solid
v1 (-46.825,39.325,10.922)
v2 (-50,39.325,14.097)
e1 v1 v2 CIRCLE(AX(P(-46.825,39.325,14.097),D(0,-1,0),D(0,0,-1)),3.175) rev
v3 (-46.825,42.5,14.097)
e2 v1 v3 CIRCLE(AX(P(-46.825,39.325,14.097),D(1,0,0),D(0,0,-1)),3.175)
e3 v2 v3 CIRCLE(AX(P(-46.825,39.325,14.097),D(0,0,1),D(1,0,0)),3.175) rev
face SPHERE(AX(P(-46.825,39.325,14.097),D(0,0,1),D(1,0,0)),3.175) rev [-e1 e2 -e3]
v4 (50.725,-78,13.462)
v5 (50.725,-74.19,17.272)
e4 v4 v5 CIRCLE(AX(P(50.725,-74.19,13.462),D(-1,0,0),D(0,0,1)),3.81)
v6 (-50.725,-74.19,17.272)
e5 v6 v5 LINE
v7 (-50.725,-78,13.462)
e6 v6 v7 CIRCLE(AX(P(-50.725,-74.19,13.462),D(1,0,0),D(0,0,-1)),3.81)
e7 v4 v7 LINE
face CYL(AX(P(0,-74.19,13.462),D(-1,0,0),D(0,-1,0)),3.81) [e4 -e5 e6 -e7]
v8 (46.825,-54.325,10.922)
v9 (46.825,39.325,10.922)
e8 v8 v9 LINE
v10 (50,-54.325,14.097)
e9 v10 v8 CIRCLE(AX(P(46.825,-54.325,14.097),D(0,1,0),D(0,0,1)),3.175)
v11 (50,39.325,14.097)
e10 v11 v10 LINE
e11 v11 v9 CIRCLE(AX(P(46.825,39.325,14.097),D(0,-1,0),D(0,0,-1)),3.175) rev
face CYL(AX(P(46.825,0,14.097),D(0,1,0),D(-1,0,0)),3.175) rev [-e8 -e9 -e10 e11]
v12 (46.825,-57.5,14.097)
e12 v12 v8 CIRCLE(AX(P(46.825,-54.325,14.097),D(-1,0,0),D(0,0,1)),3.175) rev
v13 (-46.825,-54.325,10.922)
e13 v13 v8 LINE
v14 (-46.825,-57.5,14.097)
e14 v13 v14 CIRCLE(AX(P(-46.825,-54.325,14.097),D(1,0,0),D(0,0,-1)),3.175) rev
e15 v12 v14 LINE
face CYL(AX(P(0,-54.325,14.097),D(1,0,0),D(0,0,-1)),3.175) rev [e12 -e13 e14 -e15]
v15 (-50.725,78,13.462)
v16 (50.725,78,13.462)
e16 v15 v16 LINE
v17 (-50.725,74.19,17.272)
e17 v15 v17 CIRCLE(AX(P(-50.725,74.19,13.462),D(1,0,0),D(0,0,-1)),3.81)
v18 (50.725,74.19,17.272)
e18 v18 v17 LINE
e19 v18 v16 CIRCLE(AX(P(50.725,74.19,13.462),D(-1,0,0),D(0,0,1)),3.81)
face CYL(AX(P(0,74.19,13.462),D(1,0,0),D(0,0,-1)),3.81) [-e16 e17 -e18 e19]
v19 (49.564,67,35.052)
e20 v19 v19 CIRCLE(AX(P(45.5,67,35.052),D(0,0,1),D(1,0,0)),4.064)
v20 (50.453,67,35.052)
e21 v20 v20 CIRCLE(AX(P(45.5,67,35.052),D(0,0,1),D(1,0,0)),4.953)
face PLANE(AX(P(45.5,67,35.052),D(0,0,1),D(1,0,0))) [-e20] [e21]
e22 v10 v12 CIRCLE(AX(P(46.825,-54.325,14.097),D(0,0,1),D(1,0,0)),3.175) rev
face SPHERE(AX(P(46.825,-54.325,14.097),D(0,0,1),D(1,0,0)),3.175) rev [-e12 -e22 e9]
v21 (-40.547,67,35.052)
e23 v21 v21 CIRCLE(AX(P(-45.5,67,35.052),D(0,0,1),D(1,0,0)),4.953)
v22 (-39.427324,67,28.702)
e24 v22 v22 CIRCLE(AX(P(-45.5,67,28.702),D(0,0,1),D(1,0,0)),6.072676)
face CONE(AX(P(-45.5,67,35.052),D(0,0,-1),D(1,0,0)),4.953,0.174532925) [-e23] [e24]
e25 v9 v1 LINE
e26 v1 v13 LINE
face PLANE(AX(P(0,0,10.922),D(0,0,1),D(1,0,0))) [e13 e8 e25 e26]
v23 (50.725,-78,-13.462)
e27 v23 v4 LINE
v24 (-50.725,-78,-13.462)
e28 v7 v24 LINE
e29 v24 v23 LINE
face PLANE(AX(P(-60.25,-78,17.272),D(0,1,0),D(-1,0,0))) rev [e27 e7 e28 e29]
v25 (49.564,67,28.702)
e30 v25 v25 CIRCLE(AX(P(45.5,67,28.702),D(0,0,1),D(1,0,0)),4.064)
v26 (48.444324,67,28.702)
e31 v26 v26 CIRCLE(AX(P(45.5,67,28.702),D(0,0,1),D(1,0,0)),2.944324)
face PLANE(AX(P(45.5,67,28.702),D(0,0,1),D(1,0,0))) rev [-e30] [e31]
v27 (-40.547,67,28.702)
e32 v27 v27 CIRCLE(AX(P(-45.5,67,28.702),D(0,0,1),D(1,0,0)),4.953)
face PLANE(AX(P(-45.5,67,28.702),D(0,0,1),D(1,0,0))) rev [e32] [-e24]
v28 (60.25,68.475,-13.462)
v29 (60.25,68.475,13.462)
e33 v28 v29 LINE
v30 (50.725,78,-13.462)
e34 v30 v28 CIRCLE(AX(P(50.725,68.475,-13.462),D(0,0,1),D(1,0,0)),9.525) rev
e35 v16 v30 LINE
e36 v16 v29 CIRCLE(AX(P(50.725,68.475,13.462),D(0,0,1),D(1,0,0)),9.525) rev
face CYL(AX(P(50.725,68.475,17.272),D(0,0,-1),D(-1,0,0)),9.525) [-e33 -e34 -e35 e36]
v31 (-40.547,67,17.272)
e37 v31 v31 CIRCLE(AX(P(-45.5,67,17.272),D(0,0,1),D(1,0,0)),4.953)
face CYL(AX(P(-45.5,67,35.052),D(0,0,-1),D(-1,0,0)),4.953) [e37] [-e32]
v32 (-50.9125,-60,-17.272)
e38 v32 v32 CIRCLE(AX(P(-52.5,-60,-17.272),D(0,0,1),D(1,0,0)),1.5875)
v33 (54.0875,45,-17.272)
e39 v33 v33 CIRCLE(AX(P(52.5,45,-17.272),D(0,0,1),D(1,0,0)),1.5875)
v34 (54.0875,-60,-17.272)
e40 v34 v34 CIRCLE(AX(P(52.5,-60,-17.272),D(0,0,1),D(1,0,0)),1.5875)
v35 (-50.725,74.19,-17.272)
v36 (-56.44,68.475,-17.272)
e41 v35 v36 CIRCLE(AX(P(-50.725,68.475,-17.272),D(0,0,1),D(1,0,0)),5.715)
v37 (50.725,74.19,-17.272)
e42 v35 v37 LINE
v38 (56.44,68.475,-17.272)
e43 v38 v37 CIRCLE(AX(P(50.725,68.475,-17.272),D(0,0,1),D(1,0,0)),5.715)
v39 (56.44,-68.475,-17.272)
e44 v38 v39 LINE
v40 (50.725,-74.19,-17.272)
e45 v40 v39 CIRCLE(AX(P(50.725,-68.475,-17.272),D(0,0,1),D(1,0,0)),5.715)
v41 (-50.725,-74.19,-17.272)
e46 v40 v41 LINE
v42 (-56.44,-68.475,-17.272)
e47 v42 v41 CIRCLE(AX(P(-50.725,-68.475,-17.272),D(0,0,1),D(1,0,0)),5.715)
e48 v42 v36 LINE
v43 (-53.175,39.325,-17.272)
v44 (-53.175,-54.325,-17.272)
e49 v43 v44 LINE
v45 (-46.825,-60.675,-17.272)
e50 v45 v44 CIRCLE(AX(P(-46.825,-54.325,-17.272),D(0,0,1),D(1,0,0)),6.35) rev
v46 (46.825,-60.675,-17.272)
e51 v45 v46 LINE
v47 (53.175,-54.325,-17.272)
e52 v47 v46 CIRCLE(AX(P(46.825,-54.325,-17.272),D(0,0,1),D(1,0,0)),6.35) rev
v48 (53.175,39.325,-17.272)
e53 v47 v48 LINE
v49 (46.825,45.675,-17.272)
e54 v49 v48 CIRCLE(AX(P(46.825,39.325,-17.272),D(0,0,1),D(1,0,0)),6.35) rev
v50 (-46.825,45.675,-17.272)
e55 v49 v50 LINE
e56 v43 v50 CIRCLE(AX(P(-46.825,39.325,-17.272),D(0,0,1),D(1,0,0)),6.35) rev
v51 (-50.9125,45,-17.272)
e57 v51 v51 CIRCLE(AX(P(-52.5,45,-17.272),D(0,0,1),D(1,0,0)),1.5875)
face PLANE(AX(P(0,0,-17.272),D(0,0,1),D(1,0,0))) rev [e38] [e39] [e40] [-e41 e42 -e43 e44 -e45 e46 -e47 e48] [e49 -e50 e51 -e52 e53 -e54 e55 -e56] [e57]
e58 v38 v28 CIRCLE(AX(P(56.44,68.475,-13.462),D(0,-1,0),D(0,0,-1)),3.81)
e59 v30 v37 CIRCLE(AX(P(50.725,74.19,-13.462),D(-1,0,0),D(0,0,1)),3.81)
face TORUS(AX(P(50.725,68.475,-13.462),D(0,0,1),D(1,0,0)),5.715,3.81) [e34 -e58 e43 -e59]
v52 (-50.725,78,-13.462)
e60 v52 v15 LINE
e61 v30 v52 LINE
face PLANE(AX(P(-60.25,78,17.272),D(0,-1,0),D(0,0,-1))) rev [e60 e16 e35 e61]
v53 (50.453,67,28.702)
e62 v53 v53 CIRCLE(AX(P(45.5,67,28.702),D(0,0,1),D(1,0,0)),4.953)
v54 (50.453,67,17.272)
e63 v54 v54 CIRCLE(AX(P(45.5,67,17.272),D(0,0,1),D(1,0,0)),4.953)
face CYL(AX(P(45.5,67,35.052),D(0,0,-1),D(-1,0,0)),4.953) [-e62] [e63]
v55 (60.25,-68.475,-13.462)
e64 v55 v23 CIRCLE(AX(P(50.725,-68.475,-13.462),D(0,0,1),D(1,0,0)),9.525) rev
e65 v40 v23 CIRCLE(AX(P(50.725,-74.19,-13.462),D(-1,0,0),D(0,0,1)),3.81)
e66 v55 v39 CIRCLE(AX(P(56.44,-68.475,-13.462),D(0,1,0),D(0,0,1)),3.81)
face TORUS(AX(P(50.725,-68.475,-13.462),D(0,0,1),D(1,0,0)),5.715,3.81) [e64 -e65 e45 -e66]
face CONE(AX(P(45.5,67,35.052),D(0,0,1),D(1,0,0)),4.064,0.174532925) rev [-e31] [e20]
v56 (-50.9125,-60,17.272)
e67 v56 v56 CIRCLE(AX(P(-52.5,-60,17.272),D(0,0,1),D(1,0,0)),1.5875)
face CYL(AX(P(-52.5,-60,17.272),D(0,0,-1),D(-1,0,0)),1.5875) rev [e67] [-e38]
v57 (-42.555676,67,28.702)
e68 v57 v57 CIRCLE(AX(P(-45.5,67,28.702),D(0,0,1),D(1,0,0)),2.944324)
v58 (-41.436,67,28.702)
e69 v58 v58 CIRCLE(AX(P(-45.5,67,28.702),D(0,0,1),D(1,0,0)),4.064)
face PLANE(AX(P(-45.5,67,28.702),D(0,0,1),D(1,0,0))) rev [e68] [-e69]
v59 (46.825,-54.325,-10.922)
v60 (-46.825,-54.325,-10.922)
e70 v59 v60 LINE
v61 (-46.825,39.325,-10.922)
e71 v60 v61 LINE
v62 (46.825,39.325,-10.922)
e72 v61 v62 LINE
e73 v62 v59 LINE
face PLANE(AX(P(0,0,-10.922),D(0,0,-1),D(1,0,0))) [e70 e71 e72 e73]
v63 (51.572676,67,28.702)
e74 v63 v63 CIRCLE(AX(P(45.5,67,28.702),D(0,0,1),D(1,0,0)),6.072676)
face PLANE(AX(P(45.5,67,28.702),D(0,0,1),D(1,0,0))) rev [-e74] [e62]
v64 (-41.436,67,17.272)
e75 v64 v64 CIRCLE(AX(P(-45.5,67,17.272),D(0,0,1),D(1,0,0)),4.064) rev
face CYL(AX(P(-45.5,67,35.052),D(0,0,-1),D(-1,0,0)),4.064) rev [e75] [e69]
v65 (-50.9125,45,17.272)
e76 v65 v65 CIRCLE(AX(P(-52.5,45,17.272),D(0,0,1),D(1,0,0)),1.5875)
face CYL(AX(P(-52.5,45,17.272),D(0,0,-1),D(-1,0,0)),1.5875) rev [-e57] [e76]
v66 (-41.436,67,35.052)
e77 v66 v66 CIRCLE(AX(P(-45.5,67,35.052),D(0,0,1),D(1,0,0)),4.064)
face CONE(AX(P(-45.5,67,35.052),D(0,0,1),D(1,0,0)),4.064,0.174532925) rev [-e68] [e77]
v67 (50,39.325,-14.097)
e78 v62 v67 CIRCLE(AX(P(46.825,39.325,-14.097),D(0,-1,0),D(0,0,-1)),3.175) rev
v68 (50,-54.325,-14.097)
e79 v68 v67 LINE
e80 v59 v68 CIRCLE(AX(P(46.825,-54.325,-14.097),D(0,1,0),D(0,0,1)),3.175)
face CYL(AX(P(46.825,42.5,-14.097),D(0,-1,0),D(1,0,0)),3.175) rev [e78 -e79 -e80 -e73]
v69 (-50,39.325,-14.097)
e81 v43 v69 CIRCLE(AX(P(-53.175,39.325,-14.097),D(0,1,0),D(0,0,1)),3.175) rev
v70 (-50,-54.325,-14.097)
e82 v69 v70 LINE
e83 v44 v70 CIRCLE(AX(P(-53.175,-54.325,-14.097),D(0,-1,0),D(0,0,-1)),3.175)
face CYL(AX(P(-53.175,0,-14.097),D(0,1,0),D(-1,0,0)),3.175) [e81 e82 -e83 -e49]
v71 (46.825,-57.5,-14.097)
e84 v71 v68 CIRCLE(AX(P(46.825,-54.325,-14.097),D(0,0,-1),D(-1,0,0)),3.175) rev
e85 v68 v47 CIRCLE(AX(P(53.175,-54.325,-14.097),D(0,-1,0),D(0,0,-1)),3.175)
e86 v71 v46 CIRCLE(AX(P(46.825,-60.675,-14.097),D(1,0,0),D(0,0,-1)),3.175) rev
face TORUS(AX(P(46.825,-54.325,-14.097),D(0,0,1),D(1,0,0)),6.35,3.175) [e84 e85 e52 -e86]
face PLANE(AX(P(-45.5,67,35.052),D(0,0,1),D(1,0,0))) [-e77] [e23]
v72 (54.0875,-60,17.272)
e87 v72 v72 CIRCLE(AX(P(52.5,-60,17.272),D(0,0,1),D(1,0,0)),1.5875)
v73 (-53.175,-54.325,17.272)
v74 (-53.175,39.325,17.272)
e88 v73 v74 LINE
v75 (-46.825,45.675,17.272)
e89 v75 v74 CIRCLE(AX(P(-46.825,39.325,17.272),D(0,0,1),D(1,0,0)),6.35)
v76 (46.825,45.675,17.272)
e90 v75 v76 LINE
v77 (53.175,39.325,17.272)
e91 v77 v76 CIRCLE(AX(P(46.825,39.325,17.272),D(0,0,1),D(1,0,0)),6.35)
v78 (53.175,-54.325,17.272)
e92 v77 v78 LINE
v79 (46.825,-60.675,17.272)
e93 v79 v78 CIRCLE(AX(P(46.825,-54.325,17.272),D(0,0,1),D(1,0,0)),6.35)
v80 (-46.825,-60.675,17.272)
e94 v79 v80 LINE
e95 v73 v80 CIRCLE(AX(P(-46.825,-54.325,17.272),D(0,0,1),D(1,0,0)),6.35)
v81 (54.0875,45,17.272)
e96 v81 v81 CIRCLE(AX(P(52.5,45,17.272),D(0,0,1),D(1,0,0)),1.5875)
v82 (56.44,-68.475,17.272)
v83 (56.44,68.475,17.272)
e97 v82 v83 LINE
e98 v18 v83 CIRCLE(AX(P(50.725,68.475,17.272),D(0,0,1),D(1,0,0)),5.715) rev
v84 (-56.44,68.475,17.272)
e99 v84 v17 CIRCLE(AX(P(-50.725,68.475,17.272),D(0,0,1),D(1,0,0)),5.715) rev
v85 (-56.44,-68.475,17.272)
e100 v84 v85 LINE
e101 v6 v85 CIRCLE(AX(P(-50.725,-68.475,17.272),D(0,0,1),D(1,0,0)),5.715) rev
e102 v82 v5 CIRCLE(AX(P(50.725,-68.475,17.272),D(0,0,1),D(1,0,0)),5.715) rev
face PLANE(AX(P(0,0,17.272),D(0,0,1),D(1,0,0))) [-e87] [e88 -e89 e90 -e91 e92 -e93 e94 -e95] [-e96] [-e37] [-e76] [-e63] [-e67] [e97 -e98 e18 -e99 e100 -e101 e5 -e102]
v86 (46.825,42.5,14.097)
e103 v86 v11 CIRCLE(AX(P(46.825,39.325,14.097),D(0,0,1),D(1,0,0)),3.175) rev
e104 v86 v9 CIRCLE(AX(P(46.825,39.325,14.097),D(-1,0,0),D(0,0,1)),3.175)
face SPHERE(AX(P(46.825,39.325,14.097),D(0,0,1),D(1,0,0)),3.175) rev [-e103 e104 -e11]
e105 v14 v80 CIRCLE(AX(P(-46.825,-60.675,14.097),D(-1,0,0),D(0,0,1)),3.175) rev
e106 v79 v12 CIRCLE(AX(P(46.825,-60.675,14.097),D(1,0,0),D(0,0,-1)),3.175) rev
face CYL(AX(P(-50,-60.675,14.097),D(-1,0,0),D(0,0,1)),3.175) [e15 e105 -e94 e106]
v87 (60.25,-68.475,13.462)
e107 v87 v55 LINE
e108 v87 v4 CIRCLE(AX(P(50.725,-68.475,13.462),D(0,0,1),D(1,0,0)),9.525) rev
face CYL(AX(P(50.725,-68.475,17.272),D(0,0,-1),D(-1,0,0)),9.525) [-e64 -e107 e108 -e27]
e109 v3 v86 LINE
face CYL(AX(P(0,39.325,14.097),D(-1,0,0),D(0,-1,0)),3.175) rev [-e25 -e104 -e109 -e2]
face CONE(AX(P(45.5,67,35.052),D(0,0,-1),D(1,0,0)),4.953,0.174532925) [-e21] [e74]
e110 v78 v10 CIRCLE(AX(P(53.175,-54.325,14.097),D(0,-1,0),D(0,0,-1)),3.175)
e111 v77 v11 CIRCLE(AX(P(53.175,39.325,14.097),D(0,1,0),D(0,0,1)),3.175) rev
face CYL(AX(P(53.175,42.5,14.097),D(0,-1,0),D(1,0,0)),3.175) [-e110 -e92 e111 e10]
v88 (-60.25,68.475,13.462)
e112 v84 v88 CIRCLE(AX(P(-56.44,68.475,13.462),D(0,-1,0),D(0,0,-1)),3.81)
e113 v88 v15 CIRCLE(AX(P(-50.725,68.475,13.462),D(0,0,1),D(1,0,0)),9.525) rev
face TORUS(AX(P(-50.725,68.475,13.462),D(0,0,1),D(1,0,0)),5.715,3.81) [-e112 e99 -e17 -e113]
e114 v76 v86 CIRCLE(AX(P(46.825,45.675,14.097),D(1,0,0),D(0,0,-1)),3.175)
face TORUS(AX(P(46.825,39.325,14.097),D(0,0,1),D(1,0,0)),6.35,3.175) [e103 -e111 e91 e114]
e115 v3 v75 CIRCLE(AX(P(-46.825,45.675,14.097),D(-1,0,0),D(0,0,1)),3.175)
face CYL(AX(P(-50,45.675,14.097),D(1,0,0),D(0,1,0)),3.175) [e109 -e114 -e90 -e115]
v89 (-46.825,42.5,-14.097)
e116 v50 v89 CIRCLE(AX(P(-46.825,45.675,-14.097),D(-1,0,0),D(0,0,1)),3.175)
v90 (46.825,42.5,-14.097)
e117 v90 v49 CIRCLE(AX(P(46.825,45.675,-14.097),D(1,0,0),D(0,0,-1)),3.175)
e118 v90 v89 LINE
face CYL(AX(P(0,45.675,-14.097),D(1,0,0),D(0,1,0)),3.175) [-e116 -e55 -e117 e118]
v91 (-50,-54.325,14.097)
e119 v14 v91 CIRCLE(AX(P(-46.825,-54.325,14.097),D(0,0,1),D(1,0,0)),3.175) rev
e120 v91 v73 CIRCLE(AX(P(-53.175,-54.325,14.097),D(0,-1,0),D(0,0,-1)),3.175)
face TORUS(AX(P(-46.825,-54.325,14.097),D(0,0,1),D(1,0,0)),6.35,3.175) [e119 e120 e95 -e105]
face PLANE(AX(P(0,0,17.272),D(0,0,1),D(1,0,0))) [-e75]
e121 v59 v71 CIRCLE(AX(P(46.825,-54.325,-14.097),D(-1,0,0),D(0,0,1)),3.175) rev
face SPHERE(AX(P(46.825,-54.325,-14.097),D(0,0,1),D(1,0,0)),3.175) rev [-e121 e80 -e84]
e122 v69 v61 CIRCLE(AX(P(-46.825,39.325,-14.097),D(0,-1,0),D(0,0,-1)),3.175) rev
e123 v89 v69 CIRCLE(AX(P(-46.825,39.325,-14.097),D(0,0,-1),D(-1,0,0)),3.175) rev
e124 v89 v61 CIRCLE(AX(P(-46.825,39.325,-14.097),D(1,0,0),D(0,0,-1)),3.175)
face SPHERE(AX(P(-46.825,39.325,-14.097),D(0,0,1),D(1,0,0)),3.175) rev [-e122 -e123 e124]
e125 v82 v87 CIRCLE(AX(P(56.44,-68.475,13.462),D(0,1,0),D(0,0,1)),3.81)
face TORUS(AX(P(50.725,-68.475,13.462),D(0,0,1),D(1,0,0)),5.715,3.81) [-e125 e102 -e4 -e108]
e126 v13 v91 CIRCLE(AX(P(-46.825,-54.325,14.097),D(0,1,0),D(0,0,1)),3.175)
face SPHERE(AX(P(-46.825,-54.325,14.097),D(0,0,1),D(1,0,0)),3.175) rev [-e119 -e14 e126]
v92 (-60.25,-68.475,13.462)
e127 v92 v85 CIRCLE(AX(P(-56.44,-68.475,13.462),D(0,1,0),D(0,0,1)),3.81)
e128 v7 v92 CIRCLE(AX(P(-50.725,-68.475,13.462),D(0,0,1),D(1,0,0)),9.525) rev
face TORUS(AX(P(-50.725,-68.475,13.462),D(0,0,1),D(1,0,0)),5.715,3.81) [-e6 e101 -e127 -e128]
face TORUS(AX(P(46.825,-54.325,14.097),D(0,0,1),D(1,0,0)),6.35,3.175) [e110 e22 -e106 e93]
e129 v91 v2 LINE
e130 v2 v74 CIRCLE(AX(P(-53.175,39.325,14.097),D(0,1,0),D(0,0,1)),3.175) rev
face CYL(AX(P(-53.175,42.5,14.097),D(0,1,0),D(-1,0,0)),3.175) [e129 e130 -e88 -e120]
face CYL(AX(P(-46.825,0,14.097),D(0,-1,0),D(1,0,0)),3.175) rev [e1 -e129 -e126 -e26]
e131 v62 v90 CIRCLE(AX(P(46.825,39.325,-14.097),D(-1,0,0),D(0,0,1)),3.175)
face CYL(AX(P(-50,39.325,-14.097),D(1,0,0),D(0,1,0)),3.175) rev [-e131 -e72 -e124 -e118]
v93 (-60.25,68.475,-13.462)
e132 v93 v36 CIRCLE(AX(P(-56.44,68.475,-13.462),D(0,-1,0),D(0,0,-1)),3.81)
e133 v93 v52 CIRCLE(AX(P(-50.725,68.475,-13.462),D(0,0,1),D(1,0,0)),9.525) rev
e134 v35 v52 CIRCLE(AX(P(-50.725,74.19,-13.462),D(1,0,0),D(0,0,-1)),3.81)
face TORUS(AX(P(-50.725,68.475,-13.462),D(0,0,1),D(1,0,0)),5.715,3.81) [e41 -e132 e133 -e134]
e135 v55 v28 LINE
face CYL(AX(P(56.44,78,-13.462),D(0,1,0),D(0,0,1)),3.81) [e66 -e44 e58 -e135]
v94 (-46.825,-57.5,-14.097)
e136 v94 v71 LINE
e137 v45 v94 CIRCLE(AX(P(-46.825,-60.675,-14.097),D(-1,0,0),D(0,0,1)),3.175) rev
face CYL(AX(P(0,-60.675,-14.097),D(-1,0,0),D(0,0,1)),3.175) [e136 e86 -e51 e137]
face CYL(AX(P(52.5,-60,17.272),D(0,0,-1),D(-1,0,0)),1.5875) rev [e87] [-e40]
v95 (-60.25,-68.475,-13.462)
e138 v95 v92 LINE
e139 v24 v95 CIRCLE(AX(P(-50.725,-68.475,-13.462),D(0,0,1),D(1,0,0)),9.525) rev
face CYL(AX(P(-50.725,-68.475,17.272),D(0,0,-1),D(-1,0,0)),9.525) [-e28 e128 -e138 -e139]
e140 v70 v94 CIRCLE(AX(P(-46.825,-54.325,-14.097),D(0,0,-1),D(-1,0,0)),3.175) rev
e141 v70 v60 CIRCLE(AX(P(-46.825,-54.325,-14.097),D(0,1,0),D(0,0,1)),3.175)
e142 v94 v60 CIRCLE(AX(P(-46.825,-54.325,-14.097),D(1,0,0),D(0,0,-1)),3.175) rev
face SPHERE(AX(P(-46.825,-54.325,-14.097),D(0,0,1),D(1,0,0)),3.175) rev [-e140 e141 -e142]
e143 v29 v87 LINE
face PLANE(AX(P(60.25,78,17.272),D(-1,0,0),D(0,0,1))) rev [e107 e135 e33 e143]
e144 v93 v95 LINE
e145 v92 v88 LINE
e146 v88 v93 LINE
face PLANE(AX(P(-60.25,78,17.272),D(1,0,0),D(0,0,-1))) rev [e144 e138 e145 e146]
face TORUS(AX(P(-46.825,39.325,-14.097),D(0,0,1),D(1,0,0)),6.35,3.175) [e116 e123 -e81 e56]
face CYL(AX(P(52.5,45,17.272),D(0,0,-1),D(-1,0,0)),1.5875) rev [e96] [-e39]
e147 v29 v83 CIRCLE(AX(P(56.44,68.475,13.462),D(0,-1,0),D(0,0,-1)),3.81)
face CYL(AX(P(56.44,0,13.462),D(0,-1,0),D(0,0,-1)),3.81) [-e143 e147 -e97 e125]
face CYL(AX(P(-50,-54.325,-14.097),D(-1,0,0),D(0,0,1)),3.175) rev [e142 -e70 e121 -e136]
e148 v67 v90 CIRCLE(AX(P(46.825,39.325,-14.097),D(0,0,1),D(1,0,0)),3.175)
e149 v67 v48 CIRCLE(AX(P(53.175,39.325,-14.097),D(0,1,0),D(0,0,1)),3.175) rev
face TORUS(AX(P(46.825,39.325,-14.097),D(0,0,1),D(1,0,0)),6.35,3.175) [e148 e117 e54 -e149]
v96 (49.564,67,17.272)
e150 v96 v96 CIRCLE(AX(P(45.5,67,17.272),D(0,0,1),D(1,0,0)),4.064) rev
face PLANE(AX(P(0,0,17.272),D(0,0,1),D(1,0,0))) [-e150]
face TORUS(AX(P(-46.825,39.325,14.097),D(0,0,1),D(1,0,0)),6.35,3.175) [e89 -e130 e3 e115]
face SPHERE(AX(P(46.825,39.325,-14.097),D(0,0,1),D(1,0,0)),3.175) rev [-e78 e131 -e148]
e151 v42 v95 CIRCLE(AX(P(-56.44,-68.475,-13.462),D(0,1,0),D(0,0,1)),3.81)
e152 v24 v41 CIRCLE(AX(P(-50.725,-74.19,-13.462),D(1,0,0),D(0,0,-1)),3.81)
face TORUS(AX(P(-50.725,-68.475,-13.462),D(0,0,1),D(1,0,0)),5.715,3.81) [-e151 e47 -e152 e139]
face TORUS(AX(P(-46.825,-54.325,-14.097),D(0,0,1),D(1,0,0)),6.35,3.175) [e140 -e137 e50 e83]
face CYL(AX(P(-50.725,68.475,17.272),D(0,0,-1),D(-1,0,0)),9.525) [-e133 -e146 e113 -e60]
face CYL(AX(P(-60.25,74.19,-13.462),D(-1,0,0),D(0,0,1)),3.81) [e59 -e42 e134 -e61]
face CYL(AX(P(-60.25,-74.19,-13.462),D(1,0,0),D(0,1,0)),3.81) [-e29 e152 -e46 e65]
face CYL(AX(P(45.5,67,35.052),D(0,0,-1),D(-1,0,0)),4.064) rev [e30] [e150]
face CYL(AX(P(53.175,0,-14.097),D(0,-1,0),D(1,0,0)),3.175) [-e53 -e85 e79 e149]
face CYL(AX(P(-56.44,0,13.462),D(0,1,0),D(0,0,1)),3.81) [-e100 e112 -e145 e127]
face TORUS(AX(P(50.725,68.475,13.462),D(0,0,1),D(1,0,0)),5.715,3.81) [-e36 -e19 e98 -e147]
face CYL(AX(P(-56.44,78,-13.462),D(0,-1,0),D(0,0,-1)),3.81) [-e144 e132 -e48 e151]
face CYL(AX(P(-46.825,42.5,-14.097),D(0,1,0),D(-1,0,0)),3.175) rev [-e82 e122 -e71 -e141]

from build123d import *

# Parameters (mm, degrees)
SKETCH1_W                     = 120.5
SKETCH1_H                     = 156
SKETCH1_R                     = 1.5875
BOSS_EXTRUDE1_DEPTH           = 17.272
SKETCH2_R                     = 4.953
SKETCH2_R_2                   = 4.064
BOSS_EXTRUDE2_DEPTH           = 17.78
SKETCH3_R                     = 4.953
SKETCH3_R_2                   = 4.064
BOSS_EXTRUDE3_DEPTH           = 6.35
BOSS_EXTRUDE3_DRAFT           = 10
BOSS_EXTRUDE3_PROFILE_2_DEPTH = 6.35
BOSS_EXTRUDE3_PROFILE_2_DRAFT = 10
FILLET1_R                     = 3.81
FILLET2_R                     = 9.525
SKETCH4_W                     = 100
SKETCH4_H                     = 100
CUT_EXTRUDE1_DEPTH            = 6.35
FILLET3_R                     = 3.175
FILLET3_OF_MIRROR1_R          = 3.175


# Some blends are built 0.0001 mm under size
with BuildPart() as part:
    # Sketch1 → Boss-Extrude1 (new, symmetric)
    with BuildSketch(Plane.XY):
        Rectangle(SKETCH1_W, SKETCH1_H)
        with Locations((-52.5, 45)):
            Circle(SKETCH1_R, mode=Mode.SUBTRACT)
        with Locations((52.5, 45)):
            Circle(SKETCH1_R, mode=Mode.SUBTRACT)
        with Locations((52.5, -60)):
            Circle(SKETCH1_R, mode=Mode.SUBTRACT)
        with Locations((-52.5, -60)):
            Circle(SKETCH1_R, mode=Mode.SUBTRACT)
    extrude(amount=BOSS_EXTRUDE1_DEPTH, both=True)

    # Sketch2 → Boss-Extrude2 (add)
    # profile 1 of 2: a face of its own
    with BuildSketch(Plane.XY.offset(17.272)):
        with Locations((-45.5, 67)):
            Circle(SKETCH2_R)
        with Locations((-45.5, 67)):
            Circle(SKETCH2_R_2, mode=Mode.SUBTRACT)
    # profile 2 of 2: a face of its own
    with BuildSketch(Plane.XY.offset(17.272)):
        with Locations((45.5, 67)):
            Circle(SKETCH2_R)
        with Locations((45.5, 67)):
            Circle(SKETCH2_R_2, mode=Mode.SUBTRACT)
    extrude(amount=BOSS_EXTRUDE2_DEPTH)


with BuildPart() as boss_extrude3_tool:
    # Sketch3 → Boss-Extrude3 (with draft: the straight prism first)
    with BuildSketch(Plane.XY.offset(35.052)):
        with Locations((-45.5, 67)):
            Circle(SKETCH3_R)
        with Locations((-45.5, 67)):
            Circle(SKETCH3_R_2, mode=Mode.SUBTRACT)
    extrude(amount=-BOSS_EXTRUDE3_DEPTH)
    # Boss-Extrude3: the draft: its side faces are tilted about the plane it starts from
    boss_extrude3_sides = [boss_extrude3_tool.faces().sort_by_distance(p)[0] for p in [
        (-50.453, 67, 31.877),
        (-49.564, 67, 31.877),
    ]]
    draft(boss_extrude3_sides, Plane.XY.offset(35.052), BOSS_EXTRUDE3_DRAFT)


with BuildPart() as part_1:
    add(part.part)

    # Boss-Extrude3: add boss_extrude3_tool
    add(boss_extrude3_tool.part)


with BuildPart() as boss_extrude3_profile_2_tool:
    # Sketch3 → Boss-Extrude3 profile 2 (with draft: the straight prism first)
    with BuildSketch(Plane.XY.offset(35.052)):
        with Locations((45.5, 67)):
            Circle(SKETCH3_R)
        with Locations((45.5, 67)):
            Circle(SKETCH3_R_2, mode=Mode.SUBTRACT)
    extrude(amount=-BOSS_EXTRUDE3_PROFILE_2_DEPTH)
    # Boss-Extrude3 profile 2: the draft: its side faces are tilted about the plane it starts from
    boss_extrude3_profile_2_sides = [boss_extrude3_profile_2_tool.faces().sort_by_distance(p)[0] for p in [
        (40.547, 67, 31.877),
        (41.436, 67, 31.877),
    ]]
    draft(boss_extrude3_profile_2_sides, Plane.XY.offset(35.052), BOSS_EXTRUDE3_PROFILE_2_DRAFT)


with BuildPart() as part_2:
    add(part_1.part)

    # Boss-Extrude3 profile 2: add boss_extrude3_profile_2_tool
    add(boss_extrude3_profile_2_tool.part)

    # Fillet1
    fillet1_edges = [part_2.edges().sort_by_distance(p)[0] for p in [
        (-60.25, 0, 17.272),
        (0, -78, 17.272),
        (60.25, 0, 17.272),
        (0, -78, -17.272),
        (-60.25, 0, -17.272),
        (0, 78, -17.272),
        (60.25, 0, -17.272),
        (0, 78, 17.272),
    ]]
    fillet(fillet1_edges, radius=FILLET1_R)

    # Fillet2
    # the kernel refuses this fillet: 9.525 mm, written as the material it takes off along each edge
    with BuildSketch(Plane(origin=(-50.725, 68.475, 17.272), x_dir=(0, 1, 0), z_dir=(1, 0, 0))) as fillet2_piece_1:
        with BuildLine():
            CenterArc((5.715, -3.81), 3.81, 0, 90)
            Line((9.525, -3.81), (9.525, 0))
            Line((9.525, 0), (5.715, 0))
        make_face()
    revolve(axis=Axis((-50.725, 68.475, 17.272), (0, 0, 1)), revolution_arc=90, mode=Mode.SUBTRACT)
    with BuildSketch(Plane(origin=(50.725, 68.475, 17.272), x_dir=(1, 0, 0), z_dir=(0, -1, 0))) as fillet2_piece_2:
        with BuildLine():
            CenterArc((5.715, -3.81), 3.81, 0, 90)
            Line((9.525, -3.81), (9.525, 0))
            Line((9.525, 0), (5.715, 0))
        make_face()
    revolve(axis=Axis((50.725, 68.475, 17.272), (0, 0, 1)), revolution_arc=90, mode=Mode.SUBTRACT)
    with BuildSketch(Plane(origin=(-50.725, -68.475, 17.272), x_dir=(-1, 0, 0), z_dir=(0, 1, 0))) as fillet2_piece_3:
        with BuildLine():
            CenterArc((5.715, -3.81), 3.81, 0, 90)
            Line((9.525, -3.81), (9.525, 0))
            Line((9.525, 0), (5.715, 0))
        make_face()
    revolve(axis=Axis((-50.725, -68.475, 17.272), (0, 0, 1)), revolution_arc=90, mode=Mode.SUBTRACT)
    with BuildSketch(Plane(origin=(50.725, -68.475, 17.272), x_dir=(0, -1, 0), z_dir=(-1, 0, 0))) as fillet2_piece_4:
        with BuildLine():
            CenterArc((5.715, -3.81), 3.81, 0, 90)
            Line((9.525, -3.81), (9.525, 0))
            Line((9.525, 0), (5.715, 0))
        make_face()
    revolve(axis=Axis((50.725, -68.475, 17.272), (0, 0, 1)), revolution_arc=90, mode=Mode.SUBTRACT)
    with BuildSketch(Plane(origin=(-50.725, -68.475, -17.272), x_dir=(0, -1, 0), z_dir=(1, 0, 0))) as fillet2_piece_5:
        with BuildLine():
            CenterArc((5.715, -3.81), 3.81, 0, 90)
            Line((9.525, -3.81), (9.525, 0))
            Line((9.525, 0), (5.715, 0))
        make_face()
    revolve(axis=Axis((-50.725, -68.475, -17.272), (0, 0, -1)), revolution_arc=90, mode=Mode.SUBTRACT)
    with BuildSketch(Plane(origin=(-50.725, 68.475, -17.272), x_dir=(-1, 0, 0), z_dir=(0, -1, 0))) as fillet2_piece_6:
        with BuildLine():
            CenterArc((5.715, -3.81), 3.81, 0, 90)
            Line((9.525, -3.81), (9.525, 0))
            Line((9.525, 0), (5.715, 0))
        make_face()
    revolve(axis=Axis((-50.725, 68.475, -17.272), (0, 0, -1)), revolution_arc=90, mode=Mode.SUBTRACT)
    with BuildSketch(Plane(origin=(50.725, -68.475, -17.272), x_dir=(1, 0, 0), z_dir=(0, 1, 0))) as fillet2_piece_7:
        with BuildLine():
            CenterArc((5.715, -3.81), 3.81, 0, 90)
            Line((9.525, -3.81), (9.525, 0))
            Line((9.525, 0), (5.715, 0))
        make_face()
    revolve(axis=Axis((50.725, -68.475, -17.272), (0, 0, -1)), revolution_arc=90, mode=Mode.SUBTRACT)
    with BuildSketch(Plane(origin=(50.725, 68.475, -17.272), x_dir=(0, 1, 0), z_dir=(-1, 0, 0))) as fillet2_piece_8:
        with BuildLine():
            CenterArc((5.715, -3.81), 3.81, 0, 90)
            Line((9.525, -3.81), (9.525, 0))
            Line((9.525, 0), (5.715, 0))
        make_face()
    revolve(axis=Axis((50.725, 68.475, -17.272), (0, 0, -1)), revolution_arc=90, mode=Mode.SUBTRACT)
    with BuildSketch(Plane(origin=(60.25, -78, 17.272), x_dir=(0, 1, 0), z_dir=(0, 0, -1)), Plane(origin=(-60.25, -78, -17.272), x_dir=(0, 1, 0), z_dir=(0, 0, 1)), Plane(origin=(60.25, 78, 17.272), x_dir=(-1, 0, 0), z_dir=(0, 0, -1)), Plane(origin=(-60.25, 78, -17.272), x_dir=(1, 0, 0), z_dir=(0, 0, 1))) as fillet2_piece_9:
        with BuildLine():
            CenterArc((FILLET2_R, -FILLET2_R), FILLET2_R, 90, 90)
            Line((0, -FILLET2_R), (0, 0))
            Line((0, 0), (FILLET2_R, 0))
        make_face()
    extrude(amount=34.544, mode=Mode.SUBTRACT)

    # Sketch4 → Cut-Extrude1 (cut)
    with BuildSketch(Plane.XY.offset(17.272)):
        with Locations((0, -7.5)):
            Rectangle(SKETCH4_W, SKETCH4_H)
    cut_extrude1 = extrude(amount=-CUT_EXTRUDE1_DEPTH, mode=Mode.SUBTRACT)

    # Fillet3
    fillet3_edges = [part_2.edges().sort_by_distance(p)[0] for p in [
        (50, -7.5, 10.922),
        (50, 42.5, 14.097),
        (0, -57.5, 10.922),
        (50, -57.5, 14.097),
        (-50, -7.5, 10.922),
        (-50, -57.5, 14.097),
        (0, 42.5, 10.922),
        (-50, 42.5, 14.097),
        (50, -7.5, 17.272),
        (0, 42.5, 17.272),
        (-50, -7.5, 17.272),
        (0, -57.5, 17.272),
    ]]
    fillet(fillet3_edges, radius=FILLET3_R - 0.0001)  # a hair under: the kernel refuses the full size

    # Mirror1: Cut-Extrude1 across plane
    add(cut_extrude1.mirror(Plane.XY), mode=Mode.SUBTRACT)

    # Fillet3 of Mirror1
    fillet3_of_mirror1_edges = [part_2.edges().sort_by_distance(p)[0] for p in [
        (50, -7.5, -10.922),
        (50, 42.5, -14.097),
        (0, -57.5, -10.922),
        (50, -57.5, -14.097),
        (-50, -7.5, -10.922),
        (-50, -57.5, -14.097),
        (0, 42.5, -10.922),
        (-50, 42.5, -14.097),
        (50, -7.5, -17.272),
        (0, 42.5, -17.272),
        (-50, -7.5, -17.272),
        (0, -57.5, -17.272),
    ]]
    fillet(fillet3_of_mirror1_edges, radius=FILLET3_OF_MIRROR1_R - 0.0001)  # a hair under: the kernel refuses the full size


solid = part_2.part
